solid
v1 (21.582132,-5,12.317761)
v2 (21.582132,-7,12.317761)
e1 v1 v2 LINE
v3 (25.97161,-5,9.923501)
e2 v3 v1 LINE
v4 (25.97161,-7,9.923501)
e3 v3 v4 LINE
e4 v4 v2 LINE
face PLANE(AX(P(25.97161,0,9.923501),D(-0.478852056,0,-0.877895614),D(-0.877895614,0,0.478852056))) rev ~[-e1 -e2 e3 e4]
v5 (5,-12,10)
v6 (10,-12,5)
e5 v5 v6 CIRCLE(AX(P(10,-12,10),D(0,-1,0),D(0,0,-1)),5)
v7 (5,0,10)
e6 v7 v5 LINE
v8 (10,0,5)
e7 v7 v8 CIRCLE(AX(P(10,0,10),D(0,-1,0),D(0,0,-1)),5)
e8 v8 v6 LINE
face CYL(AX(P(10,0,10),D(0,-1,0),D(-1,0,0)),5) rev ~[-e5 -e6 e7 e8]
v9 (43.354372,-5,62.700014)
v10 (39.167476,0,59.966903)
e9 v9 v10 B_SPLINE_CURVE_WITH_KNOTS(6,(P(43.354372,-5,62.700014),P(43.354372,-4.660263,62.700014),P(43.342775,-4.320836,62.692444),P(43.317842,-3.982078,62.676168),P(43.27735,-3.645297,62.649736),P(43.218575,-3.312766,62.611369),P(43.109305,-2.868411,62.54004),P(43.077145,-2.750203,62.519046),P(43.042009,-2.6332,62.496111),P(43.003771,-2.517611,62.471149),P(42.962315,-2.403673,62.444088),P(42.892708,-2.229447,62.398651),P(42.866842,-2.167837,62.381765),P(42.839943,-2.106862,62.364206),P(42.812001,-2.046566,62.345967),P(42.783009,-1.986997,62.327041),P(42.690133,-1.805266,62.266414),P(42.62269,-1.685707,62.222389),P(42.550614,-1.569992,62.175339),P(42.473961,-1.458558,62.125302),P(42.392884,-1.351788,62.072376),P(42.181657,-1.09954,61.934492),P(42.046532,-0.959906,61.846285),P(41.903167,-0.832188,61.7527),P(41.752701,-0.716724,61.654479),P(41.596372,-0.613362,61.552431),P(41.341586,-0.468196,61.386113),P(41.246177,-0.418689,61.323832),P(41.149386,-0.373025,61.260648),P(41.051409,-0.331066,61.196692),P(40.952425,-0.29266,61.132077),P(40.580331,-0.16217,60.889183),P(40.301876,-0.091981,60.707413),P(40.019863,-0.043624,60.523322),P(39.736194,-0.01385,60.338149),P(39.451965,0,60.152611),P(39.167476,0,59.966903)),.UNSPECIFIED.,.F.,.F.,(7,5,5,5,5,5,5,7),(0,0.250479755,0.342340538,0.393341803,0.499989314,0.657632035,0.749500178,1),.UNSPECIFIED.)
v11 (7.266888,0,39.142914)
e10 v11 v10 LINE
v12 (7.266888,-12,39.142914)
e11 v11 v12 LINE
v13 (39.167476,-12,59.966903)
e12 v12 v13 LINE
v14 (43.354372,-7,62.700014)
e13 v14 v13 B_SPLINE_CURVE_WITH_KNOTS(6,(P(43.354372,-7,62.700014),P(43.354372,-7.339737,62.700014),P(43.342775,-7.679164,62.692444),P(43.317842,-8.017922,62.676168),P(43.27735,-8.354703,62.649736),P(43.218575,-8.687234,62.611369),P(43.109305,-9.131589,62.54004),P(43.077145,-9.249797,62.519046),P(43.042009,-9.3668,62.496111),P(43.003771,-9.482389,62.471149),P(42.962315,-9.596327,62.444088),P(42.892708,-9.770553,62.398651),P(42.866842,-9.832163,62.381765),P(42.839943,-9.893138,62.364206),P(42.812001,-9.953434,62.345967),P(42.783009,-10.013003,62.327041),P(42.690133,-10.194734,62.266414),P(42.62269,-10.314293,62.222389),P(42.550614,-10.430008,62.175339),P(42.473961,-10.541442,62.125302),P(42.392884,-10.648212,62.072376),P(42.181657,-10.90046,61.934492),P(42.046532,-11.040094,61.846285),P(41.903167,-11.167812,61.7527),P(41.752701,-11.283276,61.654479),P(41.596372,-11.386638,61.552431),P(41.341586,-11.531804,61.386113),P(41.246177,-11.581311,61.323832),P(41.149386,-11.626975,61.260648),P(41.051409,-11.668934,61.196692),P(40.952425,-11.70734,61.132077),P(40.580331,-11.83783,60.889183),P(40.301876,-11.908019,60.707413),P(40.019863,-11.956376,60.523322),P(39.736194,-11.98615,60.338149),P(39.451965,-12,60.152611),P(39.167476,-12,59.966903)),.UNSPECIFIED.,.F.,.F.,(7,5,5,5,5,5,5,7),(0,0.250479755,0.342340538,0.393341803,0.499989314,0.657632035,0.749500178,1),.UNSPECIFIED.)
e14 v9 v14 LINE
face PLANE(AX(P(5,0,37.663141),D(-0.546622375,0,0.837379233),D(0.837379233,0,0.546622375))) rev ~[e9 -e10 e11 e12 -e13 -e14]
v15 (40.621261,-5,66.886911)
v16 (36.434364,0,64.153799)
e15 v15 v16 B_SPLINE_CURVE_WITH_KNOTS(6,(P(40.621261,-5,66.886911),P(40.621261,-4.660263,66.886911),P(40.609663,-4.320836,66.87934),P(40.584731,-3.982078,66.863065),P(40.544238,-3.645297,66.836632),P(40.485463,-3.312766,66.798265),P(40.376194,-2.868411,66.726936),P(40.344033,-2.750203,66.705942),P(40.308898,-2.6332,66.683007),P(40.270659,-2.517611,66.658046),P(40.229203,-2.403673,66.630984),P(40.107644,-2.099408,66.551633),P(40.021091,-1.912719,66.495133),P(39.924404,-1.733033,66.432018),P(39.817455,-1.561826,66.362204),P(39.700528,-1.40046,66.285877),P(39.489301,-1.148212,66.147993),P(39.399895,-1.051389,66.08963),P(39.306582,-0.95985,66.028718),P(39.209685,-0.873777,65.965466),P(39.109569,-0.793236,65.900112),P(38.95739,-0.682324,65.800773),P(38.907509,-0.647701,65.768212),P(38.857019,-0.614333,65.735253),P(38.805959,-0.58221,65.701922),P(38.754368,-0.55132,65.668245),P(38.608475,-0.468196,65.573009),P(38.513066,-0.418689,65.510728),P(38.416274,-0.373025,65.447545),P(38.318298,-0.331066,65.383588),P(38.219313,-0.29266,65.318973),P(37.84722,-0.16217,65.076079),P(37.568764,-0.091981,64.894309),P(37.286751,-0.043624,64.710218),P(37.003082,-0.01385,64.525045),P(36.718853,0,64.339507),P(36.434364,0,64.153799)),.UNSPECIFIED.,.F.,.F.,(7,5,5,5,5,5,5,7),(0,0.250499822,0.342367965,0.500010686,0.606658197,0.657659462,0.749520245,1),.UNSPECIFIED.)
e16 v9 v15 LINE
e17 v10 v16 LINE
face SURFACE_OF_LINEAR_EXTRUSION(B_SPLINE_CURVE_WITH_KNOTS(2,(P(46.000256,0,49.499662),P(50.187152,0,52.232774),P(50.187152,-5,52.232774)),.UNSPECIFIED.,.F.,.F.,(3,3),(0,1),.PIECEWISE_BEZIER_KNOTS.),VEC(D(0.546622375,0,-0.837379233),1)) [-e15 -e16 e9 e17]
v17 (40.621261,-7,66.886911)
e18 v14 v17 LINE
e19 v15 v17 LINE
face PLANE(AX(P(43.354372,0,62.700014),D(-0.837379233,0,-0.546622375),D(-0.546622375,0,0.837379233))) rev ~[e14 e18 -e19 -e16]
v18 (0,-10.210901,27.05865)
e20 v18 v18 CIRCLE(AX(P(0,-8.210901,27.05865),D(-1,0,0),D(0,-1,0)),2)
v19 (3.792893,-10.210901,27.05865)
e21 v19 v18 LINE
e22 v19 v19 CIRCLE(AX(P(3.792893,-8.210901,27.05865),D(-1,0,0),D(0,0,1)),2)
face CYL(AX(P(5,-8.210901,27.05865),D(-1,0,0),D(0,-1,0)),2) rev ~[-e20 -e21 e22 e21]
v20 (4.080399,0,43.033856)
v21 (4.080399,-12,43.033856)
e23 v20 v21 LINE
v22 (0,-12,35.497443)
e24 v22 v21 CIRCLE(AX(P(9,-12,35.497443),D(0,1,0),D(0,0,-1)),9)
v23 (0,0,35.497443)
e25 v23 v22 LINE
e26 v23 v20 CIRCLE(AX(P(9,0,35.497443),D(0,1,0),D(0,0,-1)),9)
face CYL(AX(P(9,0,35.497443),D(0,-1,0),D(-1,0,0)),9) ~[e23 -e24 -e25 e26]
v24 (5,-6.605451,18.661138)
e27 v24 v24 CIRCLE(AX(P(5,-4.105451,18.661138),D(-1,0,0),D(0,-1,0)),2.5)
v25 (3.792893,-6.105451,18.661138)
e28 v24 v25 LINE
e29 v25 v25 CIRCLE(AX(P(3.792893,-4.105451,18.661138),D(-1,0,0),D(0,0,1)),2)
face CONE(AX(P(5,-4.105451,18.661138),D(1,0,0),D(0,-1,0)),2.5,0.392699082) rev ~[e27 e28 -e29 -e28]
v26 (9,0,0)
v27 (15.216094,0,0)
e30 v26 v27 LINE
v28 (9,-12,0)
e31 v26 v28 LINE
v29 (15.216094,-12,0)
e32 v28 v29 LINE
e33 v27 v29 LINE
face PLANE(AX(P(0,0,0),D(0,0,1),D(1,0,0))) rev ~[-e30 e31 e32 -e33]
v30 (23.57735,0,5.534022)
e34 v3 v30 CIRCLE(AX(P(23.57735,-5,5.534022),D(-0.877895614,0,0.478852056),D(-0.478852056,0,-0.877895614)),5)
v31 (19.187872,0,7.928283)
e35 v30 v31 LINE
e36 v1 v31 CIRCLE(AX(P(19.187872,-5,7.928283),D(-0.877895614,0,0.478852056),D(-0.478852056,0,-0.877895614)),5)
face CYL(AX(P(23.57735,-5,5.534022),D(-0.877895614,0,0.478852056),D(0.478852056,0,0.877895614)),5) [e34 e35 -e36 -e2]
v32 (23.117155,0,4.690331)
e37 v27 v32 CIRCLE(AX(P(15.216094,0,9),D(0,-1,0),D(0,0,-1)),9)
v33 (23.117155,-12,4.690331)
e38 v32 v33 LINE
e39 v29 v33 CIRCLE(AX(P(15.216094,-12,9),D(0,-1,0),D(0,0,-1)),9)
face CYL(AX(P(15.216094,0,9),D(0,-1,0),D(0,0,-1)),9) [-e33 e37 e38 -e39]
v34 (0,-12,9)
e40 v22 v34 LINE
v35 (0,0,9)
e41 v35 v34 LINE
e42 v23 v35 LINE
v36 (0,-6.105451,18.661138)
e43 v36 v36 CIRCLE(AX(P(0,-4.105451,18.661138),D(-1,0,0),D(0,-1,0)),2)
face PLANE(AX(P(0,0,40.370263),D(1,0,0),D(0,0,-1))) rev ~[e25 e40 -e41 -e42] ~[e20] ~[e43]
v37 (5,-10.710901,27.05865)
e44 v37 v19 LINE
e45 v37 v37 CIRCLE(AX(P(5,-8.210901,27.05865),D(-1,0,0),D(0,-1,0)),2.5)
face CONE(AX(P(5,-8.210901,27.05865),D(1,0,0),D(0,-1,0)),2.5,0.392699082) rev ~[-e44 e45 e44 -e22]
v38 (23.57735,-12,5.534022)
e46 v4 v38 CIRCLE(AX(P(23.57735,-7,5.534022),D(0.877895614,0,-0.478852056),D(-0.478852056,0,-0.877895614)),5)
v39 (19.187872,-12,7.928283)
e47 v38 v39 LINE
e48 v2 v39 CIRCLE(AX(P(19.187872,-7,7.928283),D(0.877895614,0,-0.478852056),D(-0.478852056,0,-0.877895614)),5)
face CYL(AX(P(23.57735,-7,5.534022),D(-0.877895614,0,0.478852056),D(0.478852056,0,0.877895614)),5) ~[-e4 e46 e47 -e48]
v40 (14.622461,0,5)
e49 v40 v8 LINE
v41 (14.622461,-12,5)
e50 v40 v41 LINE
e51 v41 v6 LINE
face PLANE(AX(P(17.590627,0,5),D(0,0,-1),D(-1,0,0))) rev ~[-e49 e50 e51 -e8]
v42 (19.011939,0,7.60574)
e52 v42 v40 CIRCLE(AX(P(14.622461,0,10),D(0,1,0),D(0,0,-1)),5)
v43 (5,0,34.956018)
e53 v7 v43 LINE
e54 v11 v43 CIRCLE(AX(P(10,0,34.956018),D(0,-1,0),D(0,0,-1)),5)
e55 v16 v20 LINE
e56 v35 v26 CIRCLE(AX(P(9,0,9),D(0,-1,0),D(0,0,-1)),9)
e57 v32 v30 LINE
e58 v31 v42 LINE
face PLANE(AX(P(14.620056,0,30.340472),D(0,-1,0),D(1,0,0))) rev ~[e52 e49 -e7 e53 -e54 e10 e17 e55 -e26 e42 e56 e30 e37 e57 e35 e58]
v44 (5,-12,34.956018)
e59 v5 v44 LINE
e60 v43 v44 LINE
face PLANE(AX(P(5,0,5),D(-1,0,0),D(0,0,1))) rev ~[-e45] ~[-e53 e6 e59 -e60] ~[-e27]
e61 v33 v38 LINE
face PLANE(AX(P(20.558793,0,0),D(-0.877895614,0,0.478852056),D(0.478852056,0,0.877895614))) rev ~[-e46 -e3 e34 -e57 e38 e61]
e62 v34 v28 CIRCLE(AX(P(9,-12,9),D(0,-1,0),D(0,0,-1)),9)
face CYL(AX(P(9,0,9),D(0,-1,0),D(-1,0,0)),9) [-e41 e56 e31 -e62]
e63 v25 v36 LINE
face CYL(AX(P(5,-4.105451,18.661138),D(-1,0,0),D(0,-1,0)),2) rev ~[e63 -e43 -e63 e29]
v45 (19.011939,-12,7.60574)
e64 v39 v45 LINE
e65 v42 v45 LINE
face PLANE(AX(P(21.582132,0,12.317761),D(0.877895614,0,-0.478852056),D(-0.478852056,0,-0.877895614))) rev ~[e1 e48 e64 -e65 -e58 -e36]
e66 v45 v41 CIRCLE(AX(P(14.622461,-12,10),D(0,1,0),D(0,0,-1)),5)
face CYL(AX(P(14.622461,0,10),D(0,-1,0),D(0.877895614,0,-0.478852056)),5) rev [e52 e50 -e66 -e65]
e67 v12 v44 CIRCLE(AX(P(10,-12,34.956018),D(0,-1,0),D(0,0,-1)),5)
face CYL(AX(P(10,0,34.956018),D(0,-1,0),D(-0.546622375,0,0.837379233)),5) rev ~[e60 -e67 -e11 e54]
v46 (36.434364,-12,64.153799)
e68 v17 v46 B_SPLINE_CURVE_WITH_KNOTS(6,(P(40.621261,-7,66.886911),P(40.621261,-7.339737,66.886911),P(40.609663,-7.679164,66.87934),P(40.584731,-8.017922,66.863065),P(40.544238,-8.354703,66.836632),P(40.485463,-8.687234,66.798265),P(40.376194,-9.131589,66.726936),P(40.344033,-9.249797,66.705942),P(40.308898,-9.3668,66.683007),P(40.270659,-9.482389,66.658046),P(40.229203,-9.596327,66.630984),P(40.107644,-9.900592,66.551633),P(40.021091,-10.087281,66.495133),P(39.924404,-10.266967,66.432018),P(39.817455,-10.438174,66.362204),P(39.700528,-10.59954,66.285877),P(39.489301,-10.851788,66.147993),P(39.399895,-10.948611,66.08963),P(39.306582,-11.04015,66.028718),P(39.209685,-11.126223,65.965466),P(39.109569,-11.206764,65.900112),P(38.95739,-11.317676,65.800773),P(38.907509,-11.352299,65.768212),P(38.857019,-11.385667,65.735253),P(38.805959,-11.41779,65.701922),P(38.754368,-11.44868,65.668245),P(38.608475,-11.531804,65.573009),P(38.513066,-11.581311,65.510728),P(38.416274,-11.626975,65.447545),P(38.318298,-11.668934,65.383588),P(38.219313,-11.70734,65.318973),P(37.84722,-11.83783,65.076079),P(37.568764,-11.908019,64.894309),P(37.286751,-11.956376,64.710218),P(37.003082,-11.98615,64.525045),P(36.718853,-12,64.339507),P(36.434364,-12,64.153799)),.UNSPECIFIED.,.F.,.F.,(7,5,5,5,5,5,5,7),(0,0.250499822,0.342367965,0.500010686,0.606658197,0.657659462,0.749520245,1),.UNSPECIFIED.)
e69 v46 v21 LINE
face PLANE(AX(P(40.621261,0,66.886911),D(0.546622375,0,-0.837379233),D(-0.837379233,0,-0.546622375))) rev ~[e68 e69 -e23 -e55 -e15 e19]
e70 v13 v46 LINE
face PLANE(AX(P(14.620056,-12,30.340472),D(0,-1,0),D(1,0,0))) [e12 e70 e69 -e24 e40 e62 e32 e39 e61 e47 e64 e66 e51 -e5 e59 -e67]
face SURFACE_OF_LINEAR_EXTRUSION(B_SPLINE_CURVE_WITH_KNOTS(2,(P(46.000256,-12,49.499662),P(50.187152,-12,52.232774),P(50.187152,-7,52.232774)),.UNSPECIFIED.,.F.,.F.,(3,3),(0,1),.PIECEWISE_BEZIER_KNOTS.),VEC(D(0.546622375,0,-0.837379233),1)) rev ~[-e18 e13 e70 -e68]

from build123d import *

# Parameters (mm, degrees)
F1_DEPTH        = 12
F2_R            = 9
F3_R            = 5
F4_R            = 9
F5_R            = 5
F6_R            = 5
F7_R            = 5
F8_T1_DEPTH     = 30
F10_R           = 5
F11_R           = 9
F13_D           = 4
F13_CSINK_D     = 5
F13_CSINK_ANGLE = 45
F14_D           = 4
F14_CSINK_D     = 5
F14_CSINK_ANGLE = 45


# Not quite as in the source:
# - a fillet or chamfer that OpenCascade refuses, or shapes differently, is made with other operations: its cross-section is extruded or revolved along the edge and cut away or added


with BuildPart() as f1:
    # F0 (on Front) → F1 (new body)
    with BuildSketch(Plane.XZ):
        Polygon((0, 40.3702630328), (0, 0), (20.5587926316, 0), (25.9716099992, 9.9235005083), (21.5821319316, 12.3177607896), (17.5906268513, 5), (5, 5), (5, 37.6631405767), (43.3543724833, 62.7000143926), (40.621260608, 66.8869105553), align=None)
    extrude(amount=F1_DEPTH)

    # F2
    f2_edges = [f1.edges().sort_by_distance(p)[0] for p in [
        (20.558793, -6, 0),
    ]]
    fillet(f2_edges, radius=F2_R)

    # F3
    f3_edges = [f1.edges().sort_by_distance(p)[0] for p in [
        (17.590627, -6, 5),
    ]]
    fillet(f3_edges, radius=F3_R)

    # F4
    f4_edges = [f1.edges().sort_by_distance(p)[0] for p in [
        (0, -6, 40.370263),
    ]]
    fillet(f4_edges, radius=F4_R)

    # F5
    f5_edges = [f1.edges().sort_by_distance(p)[0] for p in [
        (5, -6, 37.663141),
    ]]
    fillet(f5_edges, radius=F5_R)

    # F6
    f6_edges = [f1.edges().sort_by_distance(p)[0] for p in [
        (23.776871, -12, 11.120631),
    ]]
    fillet(f6_edges, radius=F6_R)

    # F7
    f7_edges = [f1.edges().sort_by_distance(p)[0] for p in [
        (23.776871, 0, 11.120631),
    ]]
    fillet(f7_edges, radius=F7_R)

    # F8: fillet of radius 5 on 2 edges, made by hand

    # F8_s2 → F8_t1 (cut)
    with BuildSketch(Plane(origin=(-8.9127980143, 0, 13.6536525057), x_dir=(0, 1, 0), z_dir=(-0.5466223751, 0, 0.8373792325))):
        with BuildLine():
            add(Edge.make_bspline(
                [(-12, -65.577281941), (-12, -70.577281941), (-7, -70.577281941)],
                knots=[0, 0, 0, 1, 1, 1], degree=2, weights=[1, 1, 1]))
            Line((-7, -70.577281941), (-12, -70.577281941))
            Line((-12, -70.577281941), (-12, -65.577281941))
        make_face()
        with BuildLine():
            add(Edge.make_bspline(
                [(0, -65.577281941), (0, -70.577281941), (-5, -70.577281941)],
                knots=[0, 0, 0, 1, 1, 1], degree=2, weights=[1, 1, 1]))
            Line((-5, -70.577281941), (0, -70.577281941))
            Line((0, -70.577281941), (0, -65.577281941))
        make_face()
    extrude(amount=F8_T1_DEPTH, mode=Mode.SUBTRACT)

    # F10
    f10_edges = [f1.edges().sort_by_distance(p)[0] for p in [
        (5, -6, 5),
    ]]
    fillet(f10_edges, radius=F10_R)

    # F11
    f11_edges = [f1.edges().sort_by_distance(p)[0] for p in [
        (0, -6, 0),
    ]]
    fillet(f11_edges, radius=F11_R)

    # F13 (through all)
    with Locations(Plane.YZ.offset(5)):
        with Locations((-8.210901171, 27.0586498082)):
            CounterSinkHole(F13_D / 2, F13_CSINK_D / 2, counter_sink_angle=F13_CSINK_ANGLE)

    # F14 (through all)
    with Locations(Plane.YZ.offset(5)):
        with Locations((-4.1054510511, 18.6611376703)):
            CounterSinkHole(F14_D / 2, F14_CSINK_D / 2, counter_sink_angle=F14_CSINK_ANGLE)


solid = f1.part
